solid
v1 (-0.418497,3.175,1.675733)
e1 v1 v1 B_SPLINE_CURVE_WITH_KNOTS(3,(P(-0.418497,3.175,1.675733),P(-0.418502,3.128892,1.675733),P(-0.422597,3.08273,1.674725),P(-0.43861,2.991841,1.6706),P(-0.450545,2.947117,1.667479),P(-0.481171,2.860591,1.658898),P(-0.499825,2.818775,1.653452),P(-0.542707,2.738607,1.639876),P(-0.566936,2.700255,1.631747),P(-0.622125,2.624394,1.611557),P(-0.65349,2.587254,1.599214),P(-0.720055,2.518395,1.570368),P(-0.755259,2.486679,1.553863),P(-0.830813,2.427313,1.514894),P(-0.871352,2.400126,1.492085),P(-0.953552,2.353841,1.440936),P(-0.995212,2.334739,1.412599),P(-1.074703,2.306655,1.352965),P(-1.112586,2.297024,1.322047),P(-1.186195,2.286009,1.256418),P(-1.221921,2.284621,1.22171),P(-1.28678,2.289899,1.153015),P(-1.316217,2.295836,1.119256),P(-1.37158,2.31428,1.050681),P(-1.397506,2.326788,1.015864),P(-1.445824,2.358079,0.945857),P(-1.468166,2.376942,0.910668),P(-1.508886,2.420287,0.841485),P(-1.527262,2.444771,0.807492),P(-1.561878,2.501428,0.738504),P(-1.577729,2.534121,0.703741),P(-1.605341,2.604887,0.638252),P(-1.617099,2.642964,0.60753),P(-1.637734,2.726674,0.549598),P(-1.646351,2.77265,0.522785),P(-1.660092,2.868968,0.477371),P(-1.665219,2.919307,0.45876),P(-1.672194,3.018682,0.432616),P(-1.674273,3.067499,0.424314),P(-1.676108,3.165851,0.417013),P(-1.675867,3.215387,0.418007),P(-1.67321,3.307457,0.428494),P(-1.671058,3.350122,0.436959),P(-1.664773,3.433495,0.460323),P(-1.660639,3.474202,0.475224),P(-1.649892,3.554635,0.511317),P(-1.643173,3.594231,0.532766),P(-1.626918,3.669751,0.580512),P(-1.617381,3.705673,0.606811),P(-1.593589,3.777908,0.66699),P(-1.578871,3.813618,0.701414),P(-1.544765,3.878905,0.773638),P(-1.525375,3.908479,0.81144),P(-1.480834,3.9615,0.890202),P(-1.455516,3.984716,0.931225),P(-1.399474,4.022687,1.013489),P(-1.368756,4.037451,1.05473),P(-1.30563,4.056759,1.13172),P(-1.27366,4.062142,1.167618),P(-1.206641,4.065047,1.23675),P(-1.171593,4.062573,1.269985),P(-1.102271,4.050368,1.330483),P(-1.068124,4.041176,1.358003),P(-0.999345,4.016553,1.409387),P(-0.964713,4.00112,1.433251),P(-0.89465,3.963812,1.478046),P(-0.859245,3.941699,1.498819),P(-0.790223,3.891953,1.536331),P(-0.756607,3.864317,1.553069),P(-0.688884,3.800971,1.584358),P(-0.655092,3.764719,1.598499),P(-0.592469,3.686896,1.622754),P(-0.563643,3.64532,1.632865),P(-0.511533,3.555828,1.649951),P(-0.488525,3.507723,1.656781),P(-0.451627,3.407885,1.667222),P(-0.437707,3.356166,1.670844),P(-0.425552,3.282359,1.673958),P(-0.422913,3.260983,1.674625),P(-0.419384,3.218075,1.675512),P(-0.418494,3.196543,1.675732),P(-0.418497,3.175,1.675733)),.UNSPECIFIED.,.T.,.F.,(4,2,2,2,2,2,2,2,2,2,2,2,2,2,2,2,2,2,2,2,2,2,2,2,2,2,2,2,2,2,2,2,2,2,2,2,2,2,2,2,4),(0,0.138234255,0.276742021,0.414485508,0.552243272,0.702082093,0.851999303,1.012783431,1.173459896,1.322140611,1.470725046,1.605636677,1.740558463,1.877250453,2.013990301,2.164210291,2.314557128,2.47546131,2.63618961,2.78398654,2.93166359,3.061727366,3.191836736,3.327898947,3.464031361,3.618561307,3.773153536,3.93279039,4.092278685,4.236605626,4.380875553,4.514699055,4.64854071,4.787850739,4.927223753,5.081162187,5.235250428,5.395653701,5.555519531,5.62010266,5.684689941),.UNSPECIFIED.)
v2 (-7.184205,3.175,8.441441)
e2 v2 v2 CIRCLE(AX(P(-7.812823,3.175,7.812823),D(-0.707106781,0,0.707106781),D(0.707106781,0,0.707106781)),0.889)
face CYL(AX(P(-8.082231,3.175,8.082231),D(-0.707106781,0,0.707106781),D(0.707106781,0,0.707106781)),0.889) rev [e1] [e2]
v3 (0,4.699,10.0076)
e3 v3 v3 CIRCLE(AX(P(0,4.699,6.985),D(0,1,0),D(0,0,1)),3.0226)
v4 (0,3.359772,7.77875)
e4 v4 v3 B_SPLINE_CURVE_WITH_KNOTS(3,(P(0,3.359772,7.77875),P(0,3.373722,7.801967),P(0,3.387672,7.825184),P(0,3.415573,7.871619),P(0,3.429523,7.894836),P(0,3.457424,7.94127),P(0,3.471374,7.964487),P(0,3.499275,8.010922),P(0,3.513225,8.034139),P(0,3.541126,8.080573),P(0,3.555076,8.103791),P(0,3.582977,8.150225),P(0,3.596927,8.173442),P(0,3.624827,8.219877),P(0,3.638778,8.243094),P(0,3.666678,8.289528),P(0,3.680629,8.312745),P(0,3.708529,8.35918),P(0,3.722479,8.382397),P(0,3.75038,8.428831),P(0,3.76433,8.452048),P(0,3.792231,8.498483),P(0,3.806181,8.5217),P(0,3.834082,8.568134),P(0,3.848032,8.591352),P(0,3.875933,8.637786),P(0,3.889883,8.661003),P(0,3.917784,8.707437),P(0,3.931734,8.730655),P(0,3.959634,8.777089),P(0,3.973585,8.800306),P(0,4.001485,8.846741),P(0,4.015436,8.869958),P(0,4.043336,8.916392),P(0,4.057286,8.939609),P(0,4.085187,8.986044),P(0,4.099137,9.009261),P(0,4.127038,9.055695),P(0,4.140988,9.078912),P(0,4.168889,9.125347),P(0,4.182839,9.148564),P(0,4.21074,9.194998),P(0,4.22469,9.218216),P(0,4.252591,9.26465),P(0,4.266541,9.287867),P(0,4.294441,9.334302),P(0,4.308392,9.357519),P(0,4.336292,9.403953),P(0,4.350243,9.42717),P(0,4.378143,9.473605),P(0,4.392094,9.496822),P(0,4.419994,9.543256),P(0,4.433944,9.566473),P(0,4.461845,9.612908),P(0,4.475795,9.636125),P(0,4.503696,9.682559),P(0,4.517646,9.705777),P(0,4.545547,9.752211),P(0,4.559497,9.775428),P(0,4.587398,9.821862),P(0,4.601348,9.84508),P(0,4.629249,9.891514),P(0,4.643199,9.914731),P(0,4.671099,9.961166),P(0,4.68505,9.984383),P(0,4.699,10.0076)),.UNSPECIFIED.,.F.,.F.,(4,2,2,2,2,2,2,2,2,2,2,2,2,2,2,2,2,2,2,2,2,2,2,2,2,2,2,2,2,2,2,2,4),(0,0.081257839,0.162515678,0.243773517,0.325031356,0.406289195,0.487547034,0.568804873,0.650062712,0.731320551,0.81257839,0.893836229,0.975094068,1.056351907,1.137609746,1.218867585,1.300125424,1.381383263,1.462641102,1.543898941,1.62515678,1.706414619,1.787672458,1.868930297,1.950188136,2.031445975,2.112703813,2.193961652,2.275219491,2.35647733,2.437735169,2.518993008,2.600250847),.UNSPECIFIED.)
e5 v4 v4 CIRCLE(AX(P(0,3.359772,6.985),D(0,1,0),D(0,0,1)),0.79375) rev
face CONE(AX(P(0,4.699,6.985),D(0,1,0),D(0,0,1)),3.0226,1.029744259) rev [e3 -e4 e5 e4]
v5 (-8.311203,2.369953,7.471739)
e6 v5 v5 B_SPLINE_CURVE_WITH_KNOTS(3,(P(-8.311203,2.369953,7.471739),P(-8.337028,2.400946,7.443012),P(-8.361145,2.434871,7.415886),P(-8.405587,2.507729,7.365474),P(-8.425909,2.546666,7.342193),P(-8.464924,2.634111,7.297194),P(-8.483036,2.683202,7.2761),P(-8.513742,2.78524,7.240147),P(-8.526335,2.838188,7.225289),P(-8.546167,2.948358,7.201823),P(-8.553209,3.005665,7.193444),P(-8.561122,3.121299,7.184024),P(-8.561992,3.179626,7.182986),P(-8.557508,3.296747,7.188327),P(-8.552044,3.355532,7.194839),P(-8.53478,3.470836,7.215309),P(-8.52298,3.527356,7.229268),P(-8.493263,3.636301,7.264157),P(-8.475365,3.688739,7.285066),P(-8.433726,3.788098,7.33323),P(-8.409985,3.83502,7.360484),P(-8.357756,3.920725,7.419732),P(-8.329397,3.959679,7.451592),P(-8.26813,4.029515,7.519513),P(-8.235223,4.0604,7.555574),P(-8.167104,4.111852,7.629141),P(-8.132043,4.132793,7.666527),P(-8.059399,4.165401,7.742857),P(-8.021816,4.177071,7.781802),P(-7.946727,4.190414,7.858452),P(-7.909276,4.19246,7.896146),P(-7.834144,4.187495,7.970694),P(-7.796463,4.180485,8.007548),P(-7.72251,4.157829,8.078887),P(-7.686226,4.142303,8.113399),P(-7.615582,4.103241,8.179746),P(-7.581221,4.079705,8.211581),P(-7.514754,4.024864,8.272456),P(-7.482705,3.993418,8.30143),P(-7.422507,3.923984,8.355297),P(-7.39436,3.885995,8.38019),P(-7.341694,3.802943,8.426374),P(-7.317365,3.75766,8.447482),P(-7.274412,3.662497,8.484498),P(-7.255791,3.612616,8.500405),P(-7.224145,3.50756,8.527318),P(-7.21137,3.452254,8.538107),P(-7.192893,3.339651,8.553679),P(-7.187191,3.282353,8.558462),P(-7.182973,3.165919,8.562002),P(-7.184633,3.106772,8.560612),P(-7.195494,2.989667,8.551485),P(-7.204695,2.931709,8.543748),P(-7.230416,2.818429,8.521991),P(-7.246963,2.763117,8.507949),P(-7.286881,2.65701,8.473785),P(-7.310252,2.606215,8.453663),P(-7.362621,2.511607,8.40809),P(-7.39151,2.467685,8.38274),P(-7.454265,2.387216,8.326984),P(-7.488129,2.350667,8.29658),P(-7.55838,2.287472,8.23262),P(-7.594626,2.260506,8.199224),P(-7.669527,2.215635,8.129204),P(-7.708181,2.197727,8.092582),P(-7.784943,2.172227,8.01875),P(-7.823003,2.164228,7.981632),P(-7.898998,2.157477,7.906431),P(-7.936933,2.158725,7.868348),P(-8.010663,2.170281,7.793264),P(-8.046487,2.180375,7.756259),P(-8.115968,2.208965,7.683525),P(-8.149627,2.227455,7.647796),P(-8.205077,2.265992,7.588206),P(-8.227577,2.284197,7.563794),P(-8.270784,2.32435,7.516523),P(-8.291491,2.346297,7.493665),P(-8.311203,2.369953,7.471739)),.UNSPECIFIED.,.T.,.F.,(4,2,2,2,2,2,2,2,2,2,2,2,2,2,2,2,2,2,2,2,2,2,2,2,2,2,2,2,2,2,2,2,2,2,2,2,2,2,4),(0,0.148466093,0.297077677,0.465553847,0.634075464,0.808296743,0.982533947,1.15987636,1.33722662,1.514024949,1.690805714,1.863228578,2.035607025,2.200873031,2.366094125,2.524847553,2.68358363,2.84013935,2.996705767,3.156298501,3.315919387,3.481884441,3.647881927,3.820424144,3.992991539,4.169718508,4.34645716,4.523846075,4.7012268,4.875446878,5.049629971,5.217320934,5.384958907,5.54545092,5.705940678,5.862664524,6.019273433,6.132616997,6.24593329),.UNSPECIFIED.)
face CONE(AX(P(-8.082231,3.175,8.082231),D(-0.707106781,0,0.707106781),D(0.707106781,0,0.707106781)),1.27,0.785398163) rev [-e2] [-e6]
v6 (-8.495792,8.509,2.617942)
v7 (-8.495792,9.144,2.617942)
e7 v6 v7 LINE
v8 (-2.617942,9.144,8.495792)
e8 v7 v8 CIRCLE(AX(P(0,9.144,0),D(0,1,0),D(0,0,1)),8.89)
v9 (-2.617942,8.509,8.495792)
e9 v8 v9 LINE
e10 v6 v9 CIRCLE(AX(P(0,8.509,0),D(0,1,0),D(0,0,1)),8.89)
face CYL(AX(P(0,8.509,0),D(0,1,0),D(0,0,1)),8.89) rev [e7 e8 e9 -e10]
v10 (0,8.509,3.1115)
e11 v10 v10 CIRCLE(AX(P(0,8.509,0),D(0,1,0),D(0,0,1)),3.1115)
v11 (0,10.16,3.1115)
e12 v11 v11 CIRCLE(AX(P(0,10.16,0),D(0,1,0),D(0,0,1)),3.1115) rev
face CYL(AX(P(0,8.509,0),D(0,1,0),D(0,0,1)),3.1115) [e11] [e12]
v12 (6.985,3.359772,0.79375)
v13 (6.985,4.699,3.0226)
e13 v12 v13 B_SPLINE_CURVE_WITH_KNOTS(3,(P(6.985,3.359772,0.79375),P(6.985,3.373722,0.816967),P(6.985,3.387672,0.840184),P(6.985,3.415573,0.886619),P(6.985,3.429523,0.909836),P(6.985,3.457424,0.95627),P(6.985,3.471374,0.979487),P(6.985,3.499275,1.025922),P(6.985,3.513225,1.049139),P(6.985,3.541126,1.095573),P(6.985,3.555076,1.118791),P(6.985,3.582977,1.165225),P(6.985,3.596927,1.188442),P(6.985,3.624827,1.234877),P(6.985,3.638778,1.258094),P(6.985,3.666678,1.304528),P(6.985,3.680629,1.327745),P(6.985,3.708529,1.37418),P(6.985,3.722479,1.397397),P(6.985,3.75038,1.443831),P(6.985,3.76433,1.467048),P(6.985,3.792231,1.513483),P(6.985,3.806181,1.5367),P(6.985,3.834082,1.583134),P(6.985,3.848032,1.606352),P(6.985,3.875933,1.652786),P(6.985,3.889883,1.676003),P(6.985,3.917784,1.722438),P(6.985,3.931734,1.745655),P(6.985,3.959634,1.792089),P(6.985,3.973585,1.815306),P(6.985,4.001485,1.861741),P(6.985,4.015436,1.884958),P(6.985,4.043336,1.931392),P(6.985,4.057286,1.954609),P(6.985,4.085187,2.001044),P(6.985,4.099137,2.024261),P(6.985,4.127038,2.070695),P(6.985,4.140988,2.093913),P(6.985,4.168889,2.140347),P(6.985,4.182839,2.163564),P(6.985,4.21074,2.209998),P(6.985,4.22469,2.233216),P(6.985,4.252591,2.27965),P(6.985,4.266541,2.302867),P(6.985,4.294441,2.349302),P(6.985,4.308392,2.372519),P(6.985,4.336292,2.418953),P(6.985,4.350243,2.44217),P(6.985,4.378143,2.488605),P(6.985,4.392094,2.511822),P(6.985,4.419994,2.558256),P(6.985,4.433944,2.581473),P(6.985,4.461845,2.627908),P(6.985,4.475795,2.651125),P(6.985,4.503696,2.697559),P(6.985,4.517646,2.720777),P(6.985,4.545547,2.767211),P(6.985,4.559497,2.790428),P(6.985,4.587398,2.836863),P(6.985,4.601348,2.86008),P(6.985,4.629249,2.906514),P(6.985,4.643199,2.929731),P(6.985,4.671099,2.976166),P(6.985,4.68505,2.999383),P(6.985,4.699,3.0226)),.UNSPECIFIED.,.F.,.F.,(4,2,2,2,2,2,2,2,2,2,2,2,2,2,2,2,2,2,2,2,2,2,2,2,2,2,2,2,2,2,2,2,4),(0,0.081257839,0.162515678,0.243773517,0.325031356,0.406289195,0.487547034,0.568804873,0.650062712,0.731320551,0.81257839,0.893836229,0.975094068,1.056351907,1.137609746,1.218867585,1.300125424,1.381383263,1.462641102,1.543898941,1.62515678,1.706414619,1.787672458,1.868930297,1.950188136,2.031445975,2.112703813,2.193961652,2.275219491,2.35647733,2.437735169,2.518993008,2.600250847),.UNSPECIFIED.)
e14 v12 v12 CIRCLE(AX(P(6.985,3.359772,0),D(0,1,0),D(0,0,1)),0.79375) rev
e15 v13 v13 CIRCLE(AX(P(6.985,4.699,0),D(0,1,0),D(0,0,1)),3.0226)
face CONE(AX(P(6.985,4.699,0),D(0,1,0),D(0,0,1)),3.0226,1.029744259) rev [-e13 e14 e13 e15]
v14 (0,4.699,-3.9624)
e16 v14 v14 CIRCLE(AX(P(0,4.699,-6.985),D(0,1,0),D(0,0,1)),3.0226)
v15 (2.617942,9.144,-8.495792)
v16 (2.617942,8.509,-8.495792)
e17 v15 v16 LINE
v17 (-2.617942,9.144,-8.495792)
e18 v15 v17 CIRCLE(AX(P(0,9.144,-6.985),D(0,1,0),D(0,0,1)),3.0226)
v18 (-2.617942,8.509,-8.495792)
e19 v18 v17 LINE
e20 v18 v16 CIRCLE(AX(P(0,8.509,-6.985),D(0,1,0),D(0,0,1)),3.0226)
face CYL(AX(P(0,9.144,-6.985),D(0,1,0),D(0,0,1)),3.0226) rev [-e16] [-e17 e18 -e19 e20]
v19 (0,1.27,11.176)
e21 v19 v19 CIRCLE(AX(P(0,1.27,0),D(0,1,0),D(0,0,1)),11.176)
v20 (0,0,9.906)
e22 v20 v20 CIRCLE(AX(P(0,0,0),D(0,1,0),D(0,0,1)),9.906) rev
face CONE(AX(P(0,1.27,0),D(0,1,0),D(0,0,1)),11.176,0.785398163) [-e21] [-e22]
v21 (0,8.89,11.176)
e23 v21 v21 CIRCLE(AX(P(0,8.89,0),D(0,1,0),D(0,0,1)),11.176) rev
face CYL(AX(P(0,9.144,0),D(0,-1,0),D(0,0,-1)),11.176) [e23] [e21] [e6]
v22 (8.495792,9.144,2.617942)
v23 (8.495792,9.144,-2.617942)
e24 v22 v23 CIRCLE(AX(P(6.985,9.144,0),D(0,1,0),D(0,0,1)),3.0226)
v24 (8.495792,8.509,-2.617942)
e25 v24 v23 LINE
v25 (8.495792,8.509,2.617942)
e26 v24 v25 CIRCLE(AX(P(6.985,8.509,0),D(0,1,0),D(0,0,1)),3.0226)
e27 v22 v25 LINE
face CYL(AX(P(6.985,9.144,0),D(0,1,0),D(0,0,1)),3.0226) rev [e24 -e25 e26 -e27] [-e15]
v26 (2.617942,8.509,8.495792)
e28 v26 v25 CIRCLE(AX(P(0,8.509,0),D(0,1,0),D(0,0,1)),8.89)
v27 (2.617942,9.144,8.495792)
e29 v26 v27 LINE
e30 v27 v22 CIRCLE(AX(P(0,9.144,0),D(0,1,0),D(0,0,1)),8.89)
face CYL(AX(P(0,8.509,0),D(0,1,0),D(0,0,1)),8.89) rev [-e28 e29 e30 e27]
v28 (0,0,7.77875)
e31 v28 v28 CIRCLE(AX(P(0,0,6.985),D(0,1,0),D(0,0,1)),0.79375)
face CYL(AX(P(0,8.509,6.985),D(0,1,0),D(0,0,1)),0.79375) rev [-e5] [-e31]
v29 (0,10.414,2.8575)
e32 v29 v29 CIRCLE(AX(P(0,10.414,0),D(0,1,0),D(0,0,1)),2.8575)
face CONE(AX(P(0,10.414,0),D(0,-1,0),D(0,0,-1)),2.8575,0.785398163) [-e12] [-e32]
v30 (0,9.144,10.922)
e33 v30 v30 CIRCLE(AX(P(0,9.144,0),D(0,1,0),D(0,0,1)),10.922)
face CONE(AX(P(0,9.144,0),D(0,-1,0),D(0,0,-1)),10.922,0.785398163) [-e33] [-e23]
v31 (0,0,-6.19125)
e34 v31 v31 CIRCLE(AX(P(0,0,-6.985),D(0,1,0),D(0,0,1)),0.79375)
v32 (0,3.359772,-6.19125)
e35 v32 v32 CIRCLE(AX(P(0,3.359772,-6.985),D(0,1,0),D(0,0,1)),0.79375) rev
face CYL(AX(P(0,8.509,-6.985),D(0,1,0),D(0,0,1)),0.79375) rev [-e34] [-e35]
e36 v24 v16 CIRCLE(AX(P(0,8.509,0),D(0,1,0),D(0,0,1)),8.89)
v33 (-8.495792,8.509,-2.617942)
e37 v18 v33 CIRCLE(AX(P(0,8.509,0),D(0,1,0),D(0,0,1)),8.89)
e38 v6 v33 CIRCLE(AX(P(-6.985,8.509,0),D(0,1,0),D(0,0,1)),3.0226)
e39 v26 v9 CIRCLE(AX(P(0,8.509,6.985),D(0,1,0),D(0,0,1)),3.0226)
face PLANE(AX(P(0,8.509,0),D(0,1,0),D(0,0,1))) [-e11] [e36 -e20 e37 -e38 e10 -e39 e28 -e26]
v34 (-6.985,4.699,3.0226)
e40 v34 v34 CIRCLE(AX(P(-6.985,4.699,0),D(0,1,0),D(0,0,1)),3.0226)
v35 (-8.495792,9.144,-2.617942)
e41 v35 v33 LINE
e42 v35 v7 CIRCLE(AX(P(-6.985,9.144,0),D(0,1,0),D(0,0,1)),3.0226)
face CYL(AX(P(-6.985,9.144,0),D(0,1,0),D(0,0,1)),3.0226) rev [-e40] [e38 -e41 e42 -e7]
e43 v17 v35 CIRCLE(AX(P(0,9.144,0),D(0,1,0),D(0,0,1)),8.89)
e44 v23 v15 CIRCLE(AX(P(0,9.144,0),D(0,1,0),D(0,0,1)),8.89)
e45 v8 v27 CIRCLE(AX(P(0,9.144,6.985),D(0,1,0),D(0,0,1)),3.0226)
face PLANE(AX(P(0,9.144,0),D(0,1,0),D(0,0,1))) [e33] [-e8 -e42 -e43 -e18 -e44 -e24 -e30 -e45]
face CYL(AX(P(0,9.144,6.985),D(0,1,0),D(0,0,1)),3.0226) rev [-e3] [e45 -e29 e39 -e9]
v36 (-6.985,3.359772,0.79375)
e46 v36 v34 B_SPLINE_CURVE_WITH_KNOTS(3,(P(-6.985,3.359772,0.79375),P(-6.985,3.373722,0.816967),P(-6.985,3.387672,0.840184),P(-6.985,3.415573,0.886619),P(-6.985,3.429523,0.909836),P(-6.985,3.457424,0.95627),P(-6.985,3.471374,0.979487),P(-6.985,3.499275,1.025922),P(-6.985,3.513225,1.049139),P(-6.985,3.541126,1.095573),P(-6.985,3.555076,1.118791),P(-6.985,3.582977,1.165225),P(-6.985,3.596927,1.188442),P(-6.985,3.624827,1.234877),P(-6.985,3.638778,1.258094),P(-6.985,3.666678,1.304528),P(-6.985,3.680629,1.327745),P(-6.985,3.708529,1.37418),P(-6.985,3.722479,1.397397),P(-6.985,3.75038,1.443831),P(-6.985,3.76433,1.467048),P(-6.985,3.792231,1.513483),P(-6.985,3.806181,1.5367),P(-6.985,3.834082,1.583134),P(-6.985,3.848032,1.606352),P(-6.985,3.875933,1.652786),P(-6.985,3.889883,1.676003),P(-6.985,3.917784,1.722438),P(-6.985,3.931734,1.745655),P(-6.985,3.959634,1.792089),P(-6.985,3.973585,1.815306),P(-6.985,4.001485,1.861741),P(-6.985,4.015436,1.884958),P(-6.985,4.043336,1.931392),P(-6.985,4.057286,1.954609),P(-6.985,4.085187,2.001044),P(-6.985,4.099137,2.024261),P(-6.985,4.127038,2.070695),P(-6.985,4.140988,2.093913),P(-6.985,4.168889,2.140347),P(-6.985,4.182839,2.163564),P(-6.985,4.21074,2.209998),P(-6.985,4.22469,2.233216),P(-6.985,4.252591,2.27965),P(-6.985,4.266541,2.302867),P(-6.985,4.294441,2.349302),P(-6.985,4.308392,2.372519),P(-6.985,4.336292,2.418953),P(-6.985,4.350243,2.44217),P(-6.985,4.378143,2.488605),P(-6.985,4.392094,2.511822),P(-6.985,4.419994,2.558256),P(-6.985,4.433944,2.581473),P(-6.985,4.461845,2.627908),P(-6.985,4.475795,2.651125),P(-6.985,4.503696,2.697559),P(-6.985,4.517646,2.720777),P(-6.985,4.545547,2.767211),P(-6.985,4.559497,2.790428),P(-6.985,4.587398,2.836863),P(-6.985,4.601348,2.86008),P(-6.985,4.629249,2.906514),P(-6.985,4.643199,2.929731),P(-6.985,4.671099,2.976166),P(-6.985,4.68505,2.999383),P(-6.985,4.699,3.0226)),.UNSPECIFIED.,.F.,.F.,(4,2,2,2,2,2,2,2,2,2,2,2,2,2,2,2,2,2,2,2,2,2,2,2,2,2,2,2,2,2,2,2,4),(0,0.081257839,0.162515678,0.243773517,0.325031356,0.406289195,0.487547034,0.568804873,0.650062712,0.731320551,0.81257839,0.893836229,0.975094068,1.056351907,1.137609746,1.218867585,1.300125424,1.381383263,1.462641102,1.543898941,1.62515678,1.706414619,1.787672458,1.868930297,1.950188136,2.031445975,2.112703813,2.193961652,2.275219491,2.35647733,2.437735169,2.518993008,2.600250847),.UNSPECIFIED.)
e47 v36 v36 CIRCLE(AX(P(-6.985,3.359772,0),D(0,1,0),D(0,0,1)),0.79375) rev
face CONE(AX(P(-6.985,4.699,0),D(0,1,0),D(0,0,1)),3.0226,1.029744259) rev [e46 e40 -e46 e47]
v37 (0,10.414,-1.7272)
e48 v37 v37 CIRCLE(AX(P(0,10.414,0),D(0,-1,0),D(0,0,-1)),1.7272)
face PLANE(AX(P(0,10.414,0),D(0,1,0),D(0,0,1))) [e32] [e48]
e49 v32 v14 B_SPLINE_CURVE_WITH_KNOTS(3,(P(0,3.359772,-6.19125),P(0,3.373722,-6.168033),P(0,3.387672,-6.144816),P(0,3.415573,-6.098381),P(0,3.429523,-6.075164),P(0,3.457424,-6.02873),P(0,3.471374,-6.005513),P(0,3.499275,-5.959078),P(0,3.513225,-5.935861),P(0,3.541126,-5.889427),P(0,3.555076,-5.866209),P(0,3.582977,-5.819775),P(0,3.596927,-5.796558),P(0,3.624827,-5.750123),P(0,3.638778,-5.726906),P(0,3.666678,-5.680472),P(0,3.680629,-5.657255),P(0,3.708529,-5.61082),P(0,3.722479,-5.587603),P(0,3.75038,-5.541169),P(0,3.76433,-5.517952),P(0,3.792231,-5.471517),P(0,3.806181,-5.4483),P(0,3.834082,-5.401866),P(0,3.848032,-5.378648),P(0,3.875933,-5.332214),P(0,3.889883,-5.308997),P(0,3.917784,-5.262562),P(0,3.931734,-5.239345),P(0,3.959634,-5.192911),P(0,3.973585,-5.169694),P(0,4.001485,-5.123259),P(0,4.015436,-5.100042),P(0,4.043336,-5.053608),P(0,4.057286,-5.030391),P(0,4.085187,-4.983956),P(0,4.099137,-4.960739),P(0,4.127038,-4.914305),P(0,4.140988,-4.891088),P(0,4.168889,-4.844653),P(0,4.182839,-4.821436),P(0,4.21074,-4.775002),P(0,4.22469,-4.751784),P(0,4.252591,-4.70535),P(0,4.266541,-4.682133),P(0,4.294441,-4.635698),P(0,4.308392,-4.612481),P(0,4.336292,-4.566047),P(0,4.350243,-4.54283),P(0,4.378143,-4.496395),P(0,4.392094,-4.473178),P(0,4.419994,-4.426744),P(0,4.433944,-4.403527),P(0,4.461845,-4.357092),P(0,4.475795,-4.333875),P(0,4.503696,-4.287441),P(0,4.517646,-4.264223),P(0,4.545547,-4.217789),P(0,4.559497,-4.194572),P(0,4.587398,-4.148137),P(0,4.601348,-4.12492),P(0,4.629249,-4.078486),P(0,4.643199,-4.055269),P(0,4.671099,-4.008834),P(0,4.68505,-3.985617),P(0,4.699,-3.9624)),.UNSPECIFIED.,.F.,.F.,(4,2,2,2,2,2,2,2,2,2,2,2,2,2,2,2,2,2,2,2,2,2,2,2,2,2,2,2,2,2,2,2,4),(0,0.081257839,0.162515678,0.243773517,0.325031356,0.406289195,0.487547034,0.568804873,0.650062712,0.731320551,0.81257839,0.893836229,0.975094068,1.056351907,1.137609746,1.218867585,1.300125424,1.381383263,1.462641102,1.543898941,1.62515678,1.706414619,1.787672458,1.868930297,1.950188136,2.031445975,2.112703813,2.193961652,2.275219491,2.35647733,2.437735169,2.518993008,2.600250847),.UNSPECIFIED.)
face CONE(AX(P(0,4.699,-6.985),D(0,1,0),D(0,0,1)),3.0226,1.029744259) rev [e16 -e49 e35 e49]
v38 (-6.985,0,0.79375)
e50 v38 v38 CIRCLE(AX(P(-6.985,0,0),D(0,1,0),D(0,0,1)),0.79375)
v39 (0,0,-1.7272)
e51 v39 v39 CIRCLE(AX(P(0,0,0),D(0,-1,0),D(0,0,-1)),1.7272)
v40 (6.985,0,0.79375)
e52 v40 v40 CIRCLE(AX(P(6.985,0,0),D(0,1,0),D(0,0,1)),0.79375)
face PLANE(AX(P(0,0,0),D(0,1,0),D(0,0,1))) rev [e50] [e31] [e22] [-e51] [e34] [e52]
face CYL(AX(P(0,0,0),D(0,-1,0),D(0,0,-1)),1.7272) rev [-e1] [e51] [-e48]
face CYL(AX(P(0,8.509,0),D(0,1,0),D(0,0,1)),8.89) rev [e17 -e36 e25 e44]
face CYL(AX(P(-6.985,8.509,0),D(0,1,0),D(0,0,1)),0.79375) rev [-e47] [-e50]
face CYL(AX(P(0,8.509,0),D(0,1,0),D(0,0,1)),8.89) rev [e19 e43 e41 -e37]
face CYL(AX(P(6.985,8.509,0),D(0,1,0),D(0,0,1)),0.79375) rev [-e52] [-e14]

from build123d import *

# Parameters (mm, degrees)
SKETCH2_R                              = 11.176
BOSS_EXTRUDE1_DEPTH                    = 9.144
SKETCH3_R                              = 8.89
SKETCH3_R_2                            = 3.1115
CUT_EXTRUDE1_DEPTH                     = 0.635
CHAMFER1_SIZE                          = 0.254
CHAMFER2_SIZE                          = 1.27
BOSS_EXTRUDE2_START                    = 1.27
SKETCH10_R                             = 3.1115
SKETCH10_R_2                           = 1.5875
BOSS_EXTRUDE2_DEPTH                    = 1.27
CHAMFER3_SIZE                          = 0.254
F_2_56_TAPPED_HOLE3_D                  = 1.778
F_2_56_TAPPED_HOLE3_DEPTH              = 11.43
F_2_56_TAPPED_HOLE3_CSINK_D            = 2.54
F_2_56_TAPPED_HOLE3_CSINK_ANGLE        = 90
F_2_56_TAPPED_HOLE3_TIP                = 0.53416509
F_29_0_136_DIAMETER_HOLE1_D            = 3.4544
B_0_238_DIAMETER_HOLE1_D               = 6.0452
B_0_238_DIAMETER_HOLE1_DEPTH           = 4.445
B_0_238_DIAMETER_HOLE1_TIP             = 1.816161307
F_1_16_0_0625_DIAMETER_HOLE1_OUTLINE_R = 0.79375
F_1_16_0_0625_DIAMETER_HOLE1_DEPTH     = 3.359771909


# Read off the part's stored shape, not the designer's step: 1/16 (0.0625) Diameter Hole1
with BuildPart() as part:
    # Sketch2 → Boss-Extrude1 (new body)
    with BuildSketch(Plane(origin=(0, 0, 0), x_dir=(1, 0, 0), z_dir=(0, 1, 0))):
        with Locations(Location((0, 0, 0), (0, 0, 270))):
            Circle(SKETCH2_R)
    extrude(amount=BOSS_EXTRUDE1_DEPTH)

    # Sketch3 → Cut-Extrude1 (cut)
    with BuildSketch(Plane(origin=(0, 9.144, 0), x_dir=(1, 0, 0), z_dir=(0, 1, 0))):
        with Locations(Location((0, 0, 0), (0, 0, 270))):
            Circle(SKETCH3_R)
        with Locations(Location((0, 0, 0), (0, 0, 270))):
            Circle(SKETCH3_R_2, mode=Mode.SUBTRACT)
    extrude(amount=-CUT_EXTRUDE1_DEPTH, mode=Mode.SUBTRACT)

    # Chamfer1
    chamfer1_edges = [part.edges().sort_by_distance(p)[0] for p in [
        (0, 9.144, -11.176),
    ]]
    chamfer(chamfer1_edges, length=CHAMFER1_SIZE)

    # Chamfer2
    chamfer2_edges = [part.edges().sort_by_distance(p)[0] for p in [
        (0, 0, -11.176),
    ]]
    chamfer(chamfer2_edges, length=CHAMFER2_SIZE)

    # Sketch10 → Boss-Extrude2 (add)
    with BuildSketch(Plane(origin=(0, 9.144, 0), x_dir=(1, 0, 0), z_dir=(0, 1, 0)).offset(BOSS_EXTRUDE2_START)):
        with Locations(Location((0, 0, 0), (0, 0, 270))):
            Circle(SKETCH10_R)
        with Locations(Location((0, 0, 0), (0, 0, 270))):
            Circle(SKETCH10_R_2, mode=Mode.SUBTRACT)
    extrude(amount=-BOSS_EXTRUDE2_DEPTH)

    # Chamfer3
    chamfer3_edges = [part.edges().sort_by_distance(p)[0] for p in [
        (0, 10.414, -3.1115),
    ]]
    chamfer(chamfer3_edges, length=CHAMFER3_SIZE)

    # #2-56 Tapped Hole3
    with Locations(Plane(origin=(-8.082230509, 0, 8.082230509), x_dir=(0, -1, 0), z_dir=(-0.7071067811865488, 0, 0.7071067811865464))):
        with Locations((-3.175, 0)):
            CounterSinkHole(F_2_56_TAPPED_HOLE3_D / 2, F_2_56_TAPPED_HOLE3_CSINK_D / 2, depth=F_2_56_TAPPED_HOLE3_DEPTH, counter_sink_angle=F_2_56_TAPPED_HOLE3_CSINK_ANGLE)
            with Locations((0, 0, -(F_2_56_TAPPED_HOLE3_DEPTH + F_2_56_TAPPED_HOLE3_TIP / 2))):  # 118° drill point
                Cone(0, F_2_56_TAPPED_HOLE3_D / 2, F_2_56_TAPPED_HOLE3_TIP, mode=Mode.SUBTRACT)

    # #29 (0.136) Diameter Hole1 (through all)
    with Locations(Plane(origin=(0, 0, 0), x_dir=(-1, 0, 0), z_dir=(0, -1, 0))):
        with Locations((0, 0)):
            Hole(F_29_0_136_DIAMETER_HOLE1_D / 2)

    # B (0.238) Diameter Hole1
    with Locations(Plane(origin=(0, 9.144, 0), x_dir=(1, 0, 0), z_dir=(0, 1, 0))):
        with Locations((-6.985, 0), (0, 6.985), (0, -6.985), (6.985, 0)):
            Hole(B_0_238_DIAMETER_HOLE1_D / 2, depth=B_0_238_DIAMETER_HOLE1_DEPTH)
            with Locations((0, 0, -(B_0_238_DIAMETER_HOLE1_DEPTH + B_0_238_DIAMETER_HOLE1_TIP / 2))):  # 118° drill point
                Cone(0, B_0_238_DIAMETER_HOLE1_D / 2, B_0_238_DIAMETER_HOLE1_TIP, mode=Mode.SUBTRACT)

    # 1/16 (0.0625) Diameter Hole1 outline → 1/16 (0.0625) Diameter Hole1 (cut)
    with BuildSketch(Plane(origin=(0, 0, 0), x_dir=(1, 0, 0), z_dir=(0, 1, 0))):
        with Locations((-6.985, 0)):
            Circle(F_1_16_0_0625_DIAMETER_HOLE1_OUTLINE_R)
        with Locations((0, -6.985)):
            Circle(F_1_16_0_0625_DIAMETER_HOLE1_OUTLINE_R)
        with Locations((6.985, 0)):
            Circle(F_1_16_0_0625_DIAMETER_HOLE1_OUTLINE_R)
        with Locations((0, 6.985)):
            Circle(F_1_16_0_0625_DIAMETER_HOLE1_OUTLINE_R)
    extrude(amount=F_1_16_0_0625_DIAMETER_HOLE1_DEPTH, mode=Mode.SUBTRACT)


solid = part.part
